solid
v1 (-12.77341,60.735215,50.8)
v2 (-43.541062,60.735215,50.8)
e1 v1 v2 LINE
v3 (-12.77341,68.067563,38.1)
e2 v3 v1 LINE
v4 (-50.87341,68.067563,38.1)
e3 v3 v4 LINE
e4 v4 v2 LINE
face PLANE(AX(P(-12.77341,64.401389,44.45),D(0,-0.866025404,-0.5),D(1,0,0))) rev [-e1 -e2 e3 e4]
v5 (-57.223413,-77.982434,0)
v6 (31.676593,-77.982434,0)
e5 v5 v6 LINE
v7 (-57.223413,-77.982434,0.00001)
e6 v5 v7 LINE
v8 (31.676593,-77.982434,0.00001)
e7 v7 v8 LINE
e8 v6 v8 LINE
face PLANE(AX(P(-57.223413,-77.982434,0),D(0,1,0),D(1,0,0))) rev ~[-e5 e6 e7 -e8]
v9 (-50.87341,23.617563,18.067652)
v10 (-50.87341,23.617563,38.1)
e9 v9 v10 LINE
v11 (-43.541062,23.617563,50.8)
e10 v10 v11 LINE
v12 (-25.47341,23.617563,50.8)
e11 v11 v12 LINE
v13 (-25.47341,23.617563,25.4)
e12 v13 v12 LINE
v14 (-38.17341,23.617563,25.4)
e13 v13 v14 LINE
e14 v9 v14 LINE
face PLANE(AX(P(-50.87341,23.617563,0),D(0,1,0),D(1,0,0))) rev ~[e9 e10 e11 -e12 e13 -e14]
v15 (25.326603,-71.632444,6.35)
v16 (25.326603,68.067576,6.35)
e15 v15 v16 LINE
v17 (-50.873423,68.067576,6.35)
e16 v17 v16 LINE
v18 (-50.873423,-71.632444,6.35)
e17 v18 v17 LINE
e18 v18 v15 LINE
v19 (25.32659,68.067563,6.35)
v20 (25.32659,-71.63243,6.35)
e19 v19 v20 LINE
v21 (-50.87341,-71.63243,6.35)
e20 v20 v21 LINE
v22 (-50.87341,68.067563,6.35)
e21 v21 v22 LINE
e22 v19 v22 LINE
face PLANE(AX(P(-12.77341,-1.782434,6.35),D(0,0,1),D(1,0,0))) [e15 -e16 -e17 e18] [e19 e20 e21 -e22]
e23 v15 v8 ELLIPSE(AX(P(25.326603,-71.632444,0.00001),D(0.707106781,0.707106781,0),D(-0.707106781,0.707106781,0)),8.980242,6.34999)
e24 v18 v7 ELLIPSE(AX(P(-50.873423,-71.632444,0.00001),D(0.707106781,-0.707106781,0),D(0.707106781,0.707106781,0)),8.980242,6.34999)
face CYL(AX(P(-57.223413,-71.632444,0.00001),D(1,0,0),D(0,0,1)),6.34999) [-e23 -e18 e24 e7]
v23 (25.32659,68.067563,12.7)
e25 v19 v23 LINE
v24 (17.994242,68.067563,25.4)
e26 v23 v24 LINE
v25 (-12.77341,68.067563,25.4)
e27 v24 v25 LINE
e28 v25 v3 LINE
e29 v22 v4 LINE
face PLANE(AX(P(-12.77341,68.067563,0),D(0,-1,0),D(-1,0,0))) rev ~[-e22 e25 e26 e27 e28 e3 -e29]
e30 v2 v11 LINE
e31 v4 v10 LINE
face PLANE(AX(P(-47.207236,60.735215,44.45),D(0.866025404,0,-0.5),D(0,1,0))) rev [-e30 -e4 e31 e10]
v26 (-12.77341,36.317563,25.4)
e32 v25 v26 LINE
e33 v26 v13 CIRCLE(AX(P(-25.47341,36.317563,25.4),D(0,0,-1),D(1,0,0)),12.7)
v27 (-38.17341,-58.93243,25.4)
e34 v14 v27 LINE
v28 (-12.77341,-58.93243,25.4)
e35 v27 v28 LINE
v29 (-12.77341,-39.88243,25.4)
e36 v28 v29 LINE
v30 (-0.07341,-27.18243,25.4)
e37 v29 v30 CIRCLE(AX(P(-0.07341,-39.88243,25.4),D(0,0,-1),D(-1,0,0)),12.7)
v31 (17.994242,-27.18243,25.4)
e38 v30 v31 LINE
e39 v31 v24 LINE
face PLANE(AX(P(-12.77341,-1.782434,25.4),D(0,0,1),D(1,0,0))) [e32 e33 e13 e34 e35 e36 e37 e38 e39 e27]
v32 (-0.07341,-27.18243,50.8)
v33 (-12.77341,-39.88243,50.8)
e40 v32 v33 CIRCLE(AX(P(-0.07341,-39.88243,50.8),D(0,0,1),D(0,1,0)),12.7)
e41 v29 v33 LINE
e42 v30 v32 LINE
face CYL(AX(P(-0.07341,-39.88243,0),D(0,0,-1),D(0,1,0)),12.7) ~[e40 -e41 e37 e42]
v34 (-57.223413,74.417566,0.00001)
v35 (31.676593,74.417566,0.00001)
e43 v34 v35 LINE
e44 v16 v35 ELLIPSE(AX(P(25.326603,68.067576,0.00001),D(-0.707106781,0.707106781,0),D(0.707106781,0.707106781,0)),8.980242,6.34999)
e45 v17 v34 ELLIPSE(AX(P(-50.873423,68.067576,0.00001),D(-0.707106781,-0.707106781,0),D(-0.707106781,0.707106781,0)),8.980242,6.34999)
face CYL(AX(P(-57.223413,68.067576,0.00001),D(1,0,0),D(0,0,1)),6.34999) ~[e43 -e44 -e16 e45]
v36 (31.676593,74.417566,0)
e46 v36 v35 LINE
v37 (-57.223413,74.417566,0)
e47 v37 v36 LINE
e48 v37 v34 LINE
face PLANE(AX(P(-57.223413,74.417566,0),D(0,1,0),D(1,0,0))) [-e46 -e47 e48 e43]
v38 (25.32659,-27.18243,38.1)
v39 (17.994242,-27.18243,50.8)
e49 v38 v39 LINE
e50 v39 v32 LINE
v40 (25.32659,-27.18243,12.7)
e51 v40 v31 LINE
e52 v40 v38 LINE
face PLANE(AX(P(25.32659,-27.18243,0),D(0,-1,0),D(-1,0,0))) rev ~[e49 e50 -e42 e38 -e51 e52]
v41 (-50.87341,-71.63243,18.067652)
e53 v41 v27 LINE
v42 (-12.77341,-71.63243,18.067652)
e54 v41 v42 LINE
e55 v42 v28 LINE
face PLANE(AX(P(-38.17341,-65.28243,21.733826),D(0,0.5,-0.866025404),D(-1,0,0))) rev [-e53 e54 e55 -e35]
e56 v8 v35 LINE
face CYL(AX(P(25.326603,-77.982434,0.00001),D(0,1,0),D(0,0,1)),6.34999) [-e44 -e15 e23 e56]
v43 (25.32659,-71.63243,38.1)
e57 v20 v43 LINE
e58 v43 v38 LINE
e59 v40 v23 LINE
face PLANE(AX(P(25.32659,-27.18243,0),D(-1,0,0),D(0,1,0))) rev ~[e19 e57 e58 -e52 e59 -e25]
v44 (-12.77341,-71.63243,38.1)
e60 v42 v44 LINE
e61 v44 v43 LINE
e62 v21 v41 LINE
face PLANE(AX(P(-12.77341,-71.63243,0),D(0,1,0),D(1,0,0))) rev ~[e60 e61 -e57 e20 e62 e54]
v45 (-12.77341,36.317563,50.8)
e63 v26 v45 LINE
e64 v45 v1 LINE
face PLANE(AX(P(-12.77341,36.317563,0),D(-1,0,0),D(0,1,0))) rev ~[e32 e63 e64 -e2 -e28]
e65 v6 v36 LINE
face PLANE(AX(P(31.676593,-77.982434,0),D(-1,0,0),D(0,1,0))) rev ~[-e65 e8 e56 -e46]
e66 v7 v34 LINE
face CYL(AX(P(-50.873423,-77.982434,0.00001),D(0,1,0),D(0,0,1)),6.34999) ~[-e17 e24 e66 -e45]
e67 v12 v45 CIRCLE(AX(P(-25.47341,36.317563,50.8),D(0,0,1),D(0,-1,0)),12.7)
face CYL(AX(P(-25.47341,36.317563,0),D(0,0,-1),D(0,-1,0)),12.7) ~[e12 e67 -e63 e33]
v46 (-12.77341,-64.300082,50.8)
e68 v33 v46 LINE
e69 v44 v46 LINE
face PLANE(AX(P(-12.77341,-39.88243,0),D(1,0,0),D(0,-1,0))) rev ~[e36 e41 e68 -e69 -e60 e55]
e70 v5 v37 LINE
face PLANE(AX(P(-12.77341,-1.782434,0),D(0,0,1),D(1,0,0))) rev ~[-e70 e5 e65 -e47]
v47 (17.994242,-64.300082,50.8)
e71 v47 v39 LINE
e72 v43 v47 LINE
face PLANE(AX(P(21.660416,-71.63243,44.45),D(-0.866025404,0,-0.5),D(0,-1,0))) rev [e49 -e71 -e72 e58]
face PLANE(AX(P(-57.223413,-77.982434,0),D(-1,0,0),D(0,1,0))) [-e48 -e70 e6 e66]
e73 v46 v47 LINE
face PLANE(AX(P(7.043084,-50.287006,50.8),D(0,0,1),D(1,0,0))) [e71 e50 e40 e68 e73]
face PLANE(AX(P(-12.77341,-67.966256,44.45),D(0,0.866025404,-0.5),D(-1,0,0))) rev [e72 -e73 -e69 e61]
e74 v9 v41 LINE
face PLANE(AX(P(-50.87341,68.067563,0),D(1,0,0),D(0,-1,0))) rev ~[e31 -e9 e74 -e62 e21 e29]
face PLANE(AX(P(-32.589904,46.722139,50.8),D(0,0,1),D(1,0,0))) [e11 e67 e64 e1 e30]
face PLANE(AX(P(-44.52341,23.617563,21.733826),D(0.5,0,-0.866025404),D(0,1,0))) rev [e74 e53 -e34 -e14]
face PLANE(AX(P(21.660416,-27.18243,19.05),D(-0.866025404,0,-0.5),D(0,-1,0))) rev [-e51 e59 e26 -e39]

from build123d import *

# Parameters (mm, degrees)
F0_W        = 88.9000063658
F0_H        = 152.4
F1_DEPTH    = 6.35
F2_DEPTH    = 25.4
F3_DEPTH    = 50.8
F4_R        = 6.34999
F5_C1_SIZE2 = 12.7
F5_C1_SIZE  = 7.3323484187
F5_C2_SIZE2 = 7.3323484187
F5_C2_SIZE  = 12.7
F5_C3_SIZE2 = 7.3323484187
F5_C3_SIZE  = 12.7
F5_C4_SIZE2 = 7.3323484187
F5_C4_SIZE  = 12.7
F5_C5_SIZE2 = 12.7
F5_C5_SIZE  = 7.3323484187
F5_C6_SIZE2 = 7.3323484187
F5_C6_SIZE  = 12.7
F6_SIZE2    = 7.3323484187
F6_SIZE     = 12.7


# Not quite as in the source:
# - a fillet or chamfer is up to 0.001 mm smaller than in the source, because OpenCascade refuses the exact size


with BuildPart() as f1:
    # F0 (on Top) → F1 (new body)
    with BuildSketch(Plane.XY):
        with Locations((-12.7734099567, -1.7824335903)):
            Rectangle(F0_W, F0_H)
        Polygon((-50.8734099567, 23.6175632268), (-50.8734099567, 68.0675632268), (-12.7734099567, 68.0675632268), (25.3265900433, 68.0675632268), (25.3265900433, -27.1824304074), (25.3265900433, -71.6324304074), (-12.7734099567, -71.6324304074), (-50.8734099567, -71.6324304074), align=None, mode=Mode.SUBTRACT)
    extrude(amount=F1_DEPTH)

    # F0 (on Top) → F2 (join)
    with BuildSketch(Plane.XY):
        with BuildLine():
            Line((25.3265900433, 68.0675632268), (-12.7734099567, 68.0675632268))
            Line((-12.7734099567, 68.0675632268), (-12.7734099567, 36.3175632268))
            ThreePointArc((-12.7734099567, 36.3175632268), (-16.4931538356, 27.3373071057), (-25.4734099567, 23.6175632268))
            Line((-25.4734099567, 23.6175632268), (-50.8734099567, 23.6175632268))
            Line((-50.8734099567, 23.6175632268), (-50.8734099567, -71.6324304074))
            Line((-50.8734099567, -71.6324304074), (-12.7734099567, -71.6324304074))
            Line((-12.7734099567, -71.6324304074), (-12.7734099567, -39.8824304074))
            ThreePointArc((-12.7734099567, -39.8824304074), (-9.0536660778, -30.9021742863), (-0.0734099567, -27.1824304074))
            Line((-0.0734099567, -27.1824304074), (25.3265900433, -27.1824304074))
            Line((25.3265900433, -27.1824304074), (25.3265900433, 68.0675632268))
        make_face()
    extrude(amount=F2_DEPTH)

    # F0 (on Top) → F3 (join)
    with BuildSketch(Plane.XY):
        with BuildLine():
            Line((-12.7734099567, 68.0675632268), (-50.8734099567, 68.0675632268))
            Line((-50.8734099567, 68.0675632268), (-50.8734099567, 23.6175632268))
            Line((-50.8734099567, 23.6175632268), (-25.4734099567, 23.6175632268))
            ThreePointArc((-25.4734099567, 23.6175632268), (-16.4931538356, 27.3373071057), (-12.7734099567, 36.3175632268))
            Line((-12.7734099567, 36.3175632268), (-12.7734099567, 68.0675632268))
        make_face()
        with BuildLine():
            Line((25.3265900433, -71.6324304074), (25.3265900433, -27.1824304074))
            Line((25.3265900433, -27.1824304074), (-0.0734099567, -27.1824304074))
            ThreePointArc((-0.0734099567, -27.1824304074), (-9.0536660778, -30.9021742863), (-12.7734099567, -39.8824304074))
            Line((-12.7734099567, -39.8824304074), (-12.7734099567, -71.6324304074))
            Line((-12.7734099567, -71.6324304074), (25.3265900433, -71.6324304074))
        make_face()
    extrude(amount=F3_DEPTH)

    # F4 (radius 6.35 in the source; OpenCascade refuses exactly that, so slightly less here)
    f4_edges = [f1.edges().sort_by_distance(p)[0] for p in [
        (31.676593, -1.782434, 6.35),
        (-12.77341, -77.982434, 6.35),
        (-57.223413, -1.782434, 6.35),
        (-12.77341, 74.417566, 6.35),
    ]]
    fillet(f4_edges, radius=F4_R)

    # F5: chamfer of 12.7 x 7.3323484187 on 6 edges, made by hand

    # F5_c1
    f5_c1_edges = [f1.edges().sort_by_distance(p)[0] for p in [
        (-50.8734099567, -24.0074335903, 25.4),
    ]]
    f5_c1_side = f1.faces().sort_by_distance((-50.8734099567, -24.0074335903, 25.2533530316))[0]
    chamfer(f5_c1_edges, length=F5_C1_SIZE, length2=F5_C1_SIZE2, reference=f5_c1_side)

    # F5_c2
    f5_c2_edges = [f1.edges().sort_by_distance(p)[0] for p in [
        (-31.8234099567, 68.0675632268, 50.8),
    ]]
    f5_c2_side = f1.faces().sort_by_distance((-31.8234099567, 68.0675632268, 50.6533530316))[0]
    chamfer(f5_c2_edges, length=F5_C2_SIZE, length2=F5_C2_SIZE2, reference=f5_c2_side)

    # F5_c3
    f5_c3_edges = [f1.edges().sort_by_distance(p)[0] for p in [
        (25.3265900433, -49.4074304074, 50.8),
    ]]
    f5_c3_side = f1.faces().sort_by_distance((25.3265900433, -49.4074304074, 50.6533530316))[0]
    chamfer(f5_c3_edges, length=F5_C3_SIZE, length2=F5_C3_SIZE2, reference=f5_c3_side)

    # F5_c4
    f5_c4_edges = [f1.edges().sort_by_distance(p)[0] for p in [
        (25.3265900433, 20.4425664097, 25.4),
    ]]
    f5_c4_side = f1.faces().sort_by_distance((25.3265900433, 20.4425664097, 25.2533530316))[0]
    chamfer(f5_c4_edges, length=F5_C4_SIZE, length2=F5_C4_SIZE2, reference=f5_c4_side)

    # F5_c5
    f5_c5_edges = [f1.edges().sort_by_distance(p)[0] for p in [
        (-25.4734099567, -71.6324304074, 25.4),
    ]]
    f5_c5_side = f1.faces().sort_by_distance((-25.4734099567, -71.6324304074, 25.2533530316))[0]
    chamfer(f5_c5_edges, length=F5_C5_SIZE, length2=F5_C5_SIZE2, reference=f5_c5_side)

    # F5_c6
    f5_c6_edges = [f1.edges().sort_by_distance(p)[0] for p in [
        (2.610415834, -71.6324304074, 50.8),
    ]]
    f5_c6_side = f1.faces().sort_by_distance((2.610415834, -71.6324304074, 50.6533530316))[0]
    chamfer(f5_c6_edges, length=F5_C6_SIZE, length2=F5_C6_SIZE2, reference=f5_c6_side)

    # F6
    f6_edges = [f1.edges().sort_by_distance(p)[0] for p in [
        (-50.87341, 42.176389, 50.8),
    ]]
    f6_side = f1.faces().sort_by_distance((-50.87341, 66.601552, 22.225))[0]
    chamfer(f6_edges, length=F6_SIZE, length2=F6_SIZE2, reference=f6_side)


solid = f1.part
